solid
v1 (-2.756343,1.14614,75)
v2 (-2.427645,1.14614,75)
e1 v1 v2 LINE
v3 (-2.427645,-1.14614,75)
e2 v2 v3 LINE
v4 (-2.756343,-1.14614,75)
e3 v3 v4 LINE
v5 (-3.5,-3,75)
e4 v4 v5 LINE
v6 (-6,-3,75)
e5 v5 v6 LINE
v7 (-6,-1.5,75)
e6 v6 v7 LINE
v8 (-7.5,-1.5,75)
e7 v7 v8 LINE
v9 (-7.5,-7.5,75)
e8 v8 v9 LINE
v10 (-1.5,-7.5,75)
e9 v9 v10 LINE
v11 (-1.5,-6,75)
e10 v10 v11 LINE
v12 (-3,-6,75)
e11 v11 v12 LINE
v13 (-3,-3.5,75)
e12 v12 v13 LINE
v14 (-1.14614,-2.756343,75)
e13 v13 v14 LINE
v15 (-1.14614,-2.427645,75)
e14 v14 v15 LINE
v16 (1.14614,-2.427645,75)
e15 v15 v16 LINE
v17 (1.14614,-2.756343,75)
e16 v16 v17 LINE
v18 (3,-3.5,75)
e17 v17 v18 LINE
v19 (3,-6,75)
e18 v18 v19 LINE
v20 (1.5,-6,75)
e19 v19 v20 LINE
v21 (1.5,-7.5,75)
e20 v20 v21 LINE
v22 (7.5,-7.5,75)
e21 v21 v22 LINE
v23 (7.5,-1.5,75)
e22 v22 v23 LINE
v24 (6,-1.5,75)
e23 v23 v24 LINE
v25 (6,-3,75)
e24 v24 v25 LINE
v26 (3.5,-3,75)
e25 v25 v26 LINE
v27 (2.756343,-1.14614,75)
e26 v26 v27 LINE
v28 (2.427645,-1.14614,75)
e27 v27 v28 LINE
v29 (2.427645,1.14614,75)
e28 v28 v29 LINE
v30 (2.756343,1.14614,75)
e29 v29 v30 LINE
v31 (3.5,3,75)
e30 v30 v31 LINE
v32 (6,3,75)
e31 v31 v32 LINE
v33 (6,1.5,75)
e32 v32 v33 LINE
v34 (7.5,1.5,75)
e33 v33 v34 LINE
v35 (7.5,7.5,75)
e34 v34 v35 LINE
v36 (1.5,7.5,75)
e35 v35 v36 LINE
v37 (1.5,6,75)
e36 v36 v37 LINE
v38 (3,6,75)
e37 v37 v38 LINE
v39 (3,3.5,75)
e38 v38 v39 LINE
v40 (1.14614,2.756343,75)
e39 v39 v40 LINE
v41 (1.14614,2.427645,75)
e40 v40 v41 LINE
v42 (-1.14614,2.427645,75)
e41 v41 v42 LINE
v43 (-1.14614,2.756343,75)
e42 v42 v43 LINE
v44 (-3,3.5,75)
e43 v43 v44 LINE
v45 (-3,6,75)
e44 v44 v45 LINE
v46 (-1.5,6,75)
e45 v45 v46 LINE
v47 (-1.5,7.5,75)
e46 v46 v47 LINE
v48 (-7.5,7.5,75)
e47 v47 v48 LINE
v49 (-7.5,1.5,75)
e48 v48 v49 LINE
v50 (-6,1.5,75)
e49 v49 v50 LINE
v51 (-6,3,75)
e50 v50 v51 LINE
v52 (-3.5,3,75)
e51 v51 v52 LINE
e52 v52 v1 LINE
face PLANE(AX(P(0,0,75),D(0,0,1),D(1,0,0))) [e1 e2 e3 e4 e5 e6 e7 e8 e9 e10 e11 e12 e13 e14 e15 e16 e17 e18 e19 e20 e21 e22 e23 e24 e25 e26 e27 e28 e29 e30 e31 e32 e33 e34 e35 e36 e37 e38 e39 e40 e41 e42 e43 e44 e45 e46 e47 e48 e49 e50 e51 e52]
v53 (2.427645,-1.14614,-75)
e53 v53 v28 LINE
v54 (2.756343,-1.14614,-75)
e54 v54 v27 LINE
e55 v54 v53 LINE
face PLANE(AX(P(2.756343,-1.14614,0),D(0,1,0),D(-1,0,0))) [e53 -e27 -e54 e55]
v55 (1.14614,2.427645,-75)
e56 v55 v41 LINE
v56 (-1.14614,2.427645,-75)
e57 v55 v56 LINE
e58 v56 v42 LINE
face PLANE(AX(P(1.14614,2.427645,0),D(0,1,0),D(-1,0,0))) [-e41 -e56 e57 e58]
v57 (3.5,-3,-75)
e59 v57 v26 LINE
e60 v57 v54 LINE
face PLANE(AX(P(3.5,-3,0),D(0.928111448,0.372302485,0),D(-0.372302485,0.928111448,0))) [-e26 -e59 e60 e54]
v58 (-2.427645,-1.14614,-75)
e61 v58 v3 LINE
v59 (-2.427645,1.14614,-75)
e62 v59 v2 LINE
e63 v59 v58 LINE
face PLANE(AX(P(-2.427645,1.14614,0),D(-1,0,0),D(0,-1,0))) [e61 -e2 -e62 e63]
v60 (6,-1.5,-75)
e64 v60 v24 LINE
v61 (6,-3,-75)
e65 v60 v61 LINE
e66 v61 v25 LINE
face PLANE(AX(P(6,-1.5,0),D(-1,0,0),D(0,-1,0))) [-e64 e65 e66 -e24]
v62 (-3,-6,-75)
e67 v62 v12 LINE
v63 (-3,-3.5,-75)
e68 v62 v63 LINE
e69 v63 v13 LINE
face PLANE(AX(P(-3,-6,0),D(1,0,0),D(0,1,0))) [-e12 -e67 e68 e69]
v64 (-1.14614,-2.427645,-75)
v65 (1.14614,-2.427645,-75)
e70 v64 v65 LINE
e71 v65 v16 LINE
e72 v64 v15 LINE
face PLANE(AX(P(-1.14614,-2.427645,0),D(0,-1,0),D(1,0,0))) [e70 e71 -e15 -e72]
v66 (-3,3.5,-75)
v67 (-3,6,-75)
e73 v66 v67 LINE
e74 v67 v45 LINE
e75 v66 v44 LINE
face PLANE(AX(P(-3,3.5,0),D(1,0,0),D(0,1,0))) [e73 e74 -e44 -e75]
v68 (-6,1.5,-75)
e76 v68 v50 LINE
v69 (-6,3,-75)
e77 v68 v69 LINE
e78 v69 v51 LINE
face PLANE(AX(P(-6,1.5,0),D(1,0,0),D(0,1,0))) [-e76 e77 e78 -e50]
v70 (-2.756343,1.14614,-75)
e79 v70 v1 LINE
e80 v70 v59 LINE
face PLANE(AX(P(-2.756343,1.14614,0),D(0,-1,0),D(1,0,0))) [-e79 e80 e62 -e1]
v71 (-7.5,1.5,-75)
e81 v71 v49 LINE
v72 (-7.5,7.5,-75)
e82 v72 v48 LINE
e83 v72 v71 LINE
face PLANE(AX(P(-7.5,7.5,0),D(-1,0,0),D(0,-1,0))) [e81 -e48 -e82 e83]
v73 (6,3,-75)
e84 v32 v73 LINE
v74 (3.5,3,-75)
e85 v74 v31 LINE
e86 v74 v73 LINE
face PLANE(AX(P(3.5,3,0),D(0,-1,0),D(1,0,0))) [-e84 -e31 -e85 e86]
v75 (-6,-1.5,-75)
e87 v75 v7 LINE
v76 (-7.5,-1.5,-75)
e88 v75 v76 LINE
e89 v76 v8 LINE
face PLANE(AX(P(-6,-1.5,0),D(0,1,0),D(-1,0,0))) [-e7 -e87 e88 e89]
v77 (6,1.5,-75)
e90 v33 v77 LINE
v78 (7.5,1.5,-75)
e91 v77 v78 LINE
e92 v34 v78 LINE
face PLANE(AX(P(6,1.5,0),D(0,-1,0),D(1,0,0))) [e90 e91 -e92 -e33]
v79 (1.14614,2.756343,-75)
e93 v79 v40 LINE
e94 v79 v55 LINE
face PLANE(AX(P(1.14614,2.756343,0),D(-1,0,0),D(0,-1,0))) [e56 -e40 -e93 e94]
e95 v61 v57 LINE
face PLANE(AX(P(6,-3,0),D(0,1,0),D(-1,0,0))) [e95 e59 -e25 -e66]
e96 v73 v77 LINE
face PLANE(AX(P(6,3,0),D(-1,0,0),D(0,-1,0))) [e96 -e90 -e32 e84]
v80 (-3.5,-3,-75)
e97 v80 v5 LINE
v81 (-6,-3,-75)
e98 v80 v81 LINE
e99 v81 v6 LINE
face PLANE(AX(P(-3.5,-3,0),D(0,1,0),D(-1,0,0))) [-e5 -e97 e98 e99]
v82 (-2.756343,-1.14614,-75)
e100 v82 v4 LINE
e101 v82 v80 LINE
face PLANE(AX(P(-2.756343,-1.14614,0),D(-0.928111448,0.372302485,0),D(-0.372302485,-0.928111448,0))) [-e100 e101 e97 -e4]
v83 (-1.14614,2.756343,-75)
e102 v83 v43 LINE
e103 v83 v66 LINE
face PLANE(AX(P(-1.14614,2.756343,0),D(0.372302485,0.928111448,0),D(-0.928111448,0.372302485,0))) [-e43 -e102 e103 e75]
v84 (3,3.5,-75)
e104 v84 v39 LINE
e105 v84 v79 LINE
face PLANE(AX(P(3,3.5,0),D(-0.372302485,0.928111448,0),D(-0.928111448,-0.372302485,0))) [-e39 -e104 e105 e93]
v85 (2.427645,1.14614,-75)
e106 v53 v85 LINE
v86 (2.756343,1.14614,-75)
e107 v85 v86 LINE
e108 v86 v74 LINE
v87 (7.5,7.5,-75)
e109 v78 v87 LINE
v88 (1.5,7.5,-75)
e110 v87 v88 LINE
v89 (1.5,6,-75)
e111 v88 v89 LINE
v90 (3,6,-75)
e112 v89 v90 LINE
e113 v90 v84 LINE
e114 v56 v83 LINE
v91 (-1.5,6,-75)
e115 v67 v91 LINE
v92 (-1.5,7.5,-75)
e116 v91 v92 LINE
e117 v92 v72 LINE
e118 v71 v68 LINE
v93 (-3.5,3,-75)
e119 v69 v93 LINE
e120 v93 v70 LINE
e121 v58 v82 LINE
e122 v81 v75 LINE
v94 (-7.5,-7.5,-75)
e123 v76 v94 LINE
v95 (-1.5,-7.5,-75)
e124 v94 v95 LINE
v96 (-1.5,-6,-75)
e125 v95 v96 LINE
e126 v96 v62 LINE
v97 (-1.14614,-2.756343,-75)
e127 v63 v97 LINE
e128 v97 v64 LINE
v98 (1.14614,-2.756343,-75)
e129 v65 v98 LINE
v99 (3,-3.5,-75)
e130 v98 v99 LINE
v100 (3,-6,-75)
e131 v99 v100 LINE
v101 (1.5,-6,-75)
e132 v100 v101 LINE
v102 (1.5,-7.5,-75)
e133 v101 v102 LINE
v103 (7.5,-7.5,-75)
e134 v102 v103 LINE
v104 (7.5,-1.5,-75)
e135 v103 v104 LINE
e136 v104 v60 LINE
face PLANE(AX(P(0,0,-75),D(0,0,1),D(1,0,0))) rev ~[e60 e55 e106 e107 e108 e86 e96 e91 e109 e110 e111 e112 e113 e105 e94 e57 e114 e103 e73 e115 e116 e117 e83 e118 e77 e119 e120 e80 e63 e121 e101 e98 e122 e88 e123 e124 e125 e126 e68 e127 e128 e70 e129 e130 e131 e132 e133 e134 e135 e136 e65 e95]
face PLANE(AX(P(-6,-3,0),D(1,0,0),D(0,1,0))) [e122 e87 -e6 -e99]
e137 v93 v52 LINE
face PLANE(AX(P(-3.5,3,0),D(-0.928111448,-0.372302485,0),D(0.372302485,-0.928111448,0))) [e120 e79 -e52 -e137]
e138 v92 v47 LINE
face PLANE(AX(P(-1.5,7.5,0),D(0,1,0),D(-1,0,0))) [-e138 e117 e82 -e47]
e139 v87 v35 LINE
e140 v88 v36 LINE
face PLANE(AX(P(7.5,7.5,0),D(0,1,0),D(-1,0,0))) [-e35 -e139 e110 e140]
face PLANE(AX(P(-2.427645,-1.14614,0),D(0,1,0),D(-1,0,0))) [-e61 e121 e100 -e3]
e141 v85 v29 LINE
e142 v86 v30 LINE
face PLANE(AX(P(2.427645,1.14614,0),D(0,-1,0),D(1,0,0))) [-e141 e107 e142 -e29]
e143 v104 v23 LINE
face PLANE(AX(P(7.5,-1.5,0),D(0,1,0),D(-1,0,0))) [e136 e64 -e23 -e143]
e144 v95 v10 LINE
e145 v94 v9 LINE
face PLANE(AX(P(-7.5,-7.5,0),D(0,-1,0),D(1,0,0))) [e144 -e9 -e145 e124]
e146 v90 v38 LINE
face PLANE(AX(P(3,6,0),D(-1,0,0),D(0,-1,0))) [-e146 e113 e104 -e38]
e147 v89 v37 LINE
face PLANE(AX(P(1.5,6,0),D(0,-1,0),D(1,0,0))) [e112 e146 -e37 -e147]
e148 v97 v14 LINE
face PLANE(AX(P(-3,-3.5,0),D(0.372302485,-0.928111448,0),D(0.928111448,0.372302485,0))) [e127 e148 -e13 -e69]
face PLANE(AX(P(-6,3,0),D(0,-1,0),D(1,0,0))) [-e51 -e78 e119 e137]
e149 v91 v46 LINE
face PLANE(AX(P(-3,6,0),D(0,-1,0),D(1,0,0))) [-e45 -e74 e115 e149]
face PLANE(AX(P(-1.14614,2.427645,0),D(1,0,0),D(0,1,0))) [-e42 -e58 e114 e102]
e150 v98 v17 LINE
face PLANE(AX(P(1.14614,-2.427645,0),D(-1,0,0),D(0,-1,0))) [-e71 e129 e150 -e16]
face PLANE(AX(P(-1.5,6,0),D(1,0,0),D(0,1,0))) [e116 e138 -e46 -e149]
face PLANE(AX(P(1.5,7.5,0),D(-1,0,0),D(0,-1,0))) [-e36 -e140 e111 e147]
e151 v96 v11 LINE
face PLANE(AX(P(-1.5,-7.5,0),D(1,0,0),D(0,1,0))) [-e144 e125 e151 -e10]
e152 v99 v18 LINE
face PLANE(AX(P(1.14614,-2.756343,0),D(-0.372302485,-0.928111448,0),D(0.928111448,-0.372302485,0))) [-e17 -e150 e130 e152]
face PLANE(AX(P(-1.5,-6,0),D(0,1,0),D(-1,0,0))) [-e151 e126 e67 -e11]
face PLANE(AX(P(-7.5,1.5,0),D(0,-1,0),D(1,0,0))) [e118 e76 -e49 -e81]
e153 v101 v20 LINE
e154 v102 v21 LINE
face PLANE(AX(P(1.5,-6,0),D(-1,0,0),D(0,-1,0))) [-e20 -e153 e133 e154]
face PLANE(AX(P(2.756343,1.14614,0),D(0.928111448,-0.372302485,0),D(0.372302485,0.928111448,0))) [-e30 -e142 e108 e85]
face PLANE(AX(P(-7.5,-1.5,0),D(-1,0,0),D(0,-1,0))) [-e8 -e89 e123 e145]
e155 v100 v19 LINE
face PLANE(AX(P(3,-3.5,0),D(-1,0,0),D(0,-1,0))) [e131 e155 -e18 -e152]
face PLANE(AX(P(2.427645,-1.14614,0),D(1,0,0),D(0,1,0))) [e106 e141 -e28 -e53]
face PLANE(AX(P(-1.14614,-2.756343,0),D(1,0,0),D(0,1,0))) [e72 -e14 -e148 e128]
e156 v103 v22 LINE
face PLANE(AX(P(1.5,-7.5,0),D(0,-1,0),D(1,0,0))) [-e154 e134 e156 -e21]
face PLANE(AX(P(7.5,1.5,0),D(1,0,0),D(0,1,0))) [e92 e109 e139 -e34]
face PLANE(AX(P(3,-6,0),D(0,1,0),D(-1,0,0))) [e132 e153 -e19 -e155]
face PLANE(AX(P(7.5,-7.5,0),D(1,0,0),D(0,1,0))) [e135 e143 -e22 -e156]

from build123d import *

# Parameters (mm, degrees)
F1_DEPTH = 75


# Not quite as in the source:
# - ends of sketch curves that miss each other by under 0.0002 mm in the source are joined


with BuildPart() as f1:
    # F0 (on Top) → F1 (new body, symmetric)
    with BuildSketch(Plane.XY):
        Polygon((7.5, 1.5), (7.5, 7.5), (1.5, 7.5), (1.5, 6), (3, 6), (3, 3.5), (1.1461396934, 2.7563427575), (1.1461396934, 2.42764467), (-1.1461396934, 2.42764467), (-1.1461396934, 2.7563427575), (-3, 3.5), (-3, 6), (-1.5, 6), (-1.5, 7.5), (-7.5, 7.5), (-7.5, 1.5), (-6, 1.5), (-6, 3), (-3.5, 3), (-2.7563427575, 1.1461396934), (-2.42764467, 1.1461396934), (-2.42764467, -1.1461396934), (-2.7563427575, -1.1461396934), (-3.5, -3), (-6, -3), (-6, -1.5), (-7.5, -1.5), (-7.5, -7.5), (-1.5, -7.5), (-1.5, -6), (-3, -6), (-3, -3.5), (-1.1461396934, -2.7563427575), (-1.1461396934, -2.42764467), (1.1461396934, -2.42764467), (1.1461396934, -2.7563427575), (3, -3.5), (3, -6), (1.5, -6), (1.5, -7.5), (7.5, -7.5), (7.5, -1.5), (6, -1.5), (6, -3), (3.5, -3), (2.7563427575, -1.1461396934), (2.42764467, -1.1461396934), (2.42764467, 1.1461396934), (2.7563427575, 1.1461396934), (3.5, 3), (6, 3), (6, 1.5), align=None)
    extrude(amount=F1_DEPTH, both=True)


solid = f1.part
